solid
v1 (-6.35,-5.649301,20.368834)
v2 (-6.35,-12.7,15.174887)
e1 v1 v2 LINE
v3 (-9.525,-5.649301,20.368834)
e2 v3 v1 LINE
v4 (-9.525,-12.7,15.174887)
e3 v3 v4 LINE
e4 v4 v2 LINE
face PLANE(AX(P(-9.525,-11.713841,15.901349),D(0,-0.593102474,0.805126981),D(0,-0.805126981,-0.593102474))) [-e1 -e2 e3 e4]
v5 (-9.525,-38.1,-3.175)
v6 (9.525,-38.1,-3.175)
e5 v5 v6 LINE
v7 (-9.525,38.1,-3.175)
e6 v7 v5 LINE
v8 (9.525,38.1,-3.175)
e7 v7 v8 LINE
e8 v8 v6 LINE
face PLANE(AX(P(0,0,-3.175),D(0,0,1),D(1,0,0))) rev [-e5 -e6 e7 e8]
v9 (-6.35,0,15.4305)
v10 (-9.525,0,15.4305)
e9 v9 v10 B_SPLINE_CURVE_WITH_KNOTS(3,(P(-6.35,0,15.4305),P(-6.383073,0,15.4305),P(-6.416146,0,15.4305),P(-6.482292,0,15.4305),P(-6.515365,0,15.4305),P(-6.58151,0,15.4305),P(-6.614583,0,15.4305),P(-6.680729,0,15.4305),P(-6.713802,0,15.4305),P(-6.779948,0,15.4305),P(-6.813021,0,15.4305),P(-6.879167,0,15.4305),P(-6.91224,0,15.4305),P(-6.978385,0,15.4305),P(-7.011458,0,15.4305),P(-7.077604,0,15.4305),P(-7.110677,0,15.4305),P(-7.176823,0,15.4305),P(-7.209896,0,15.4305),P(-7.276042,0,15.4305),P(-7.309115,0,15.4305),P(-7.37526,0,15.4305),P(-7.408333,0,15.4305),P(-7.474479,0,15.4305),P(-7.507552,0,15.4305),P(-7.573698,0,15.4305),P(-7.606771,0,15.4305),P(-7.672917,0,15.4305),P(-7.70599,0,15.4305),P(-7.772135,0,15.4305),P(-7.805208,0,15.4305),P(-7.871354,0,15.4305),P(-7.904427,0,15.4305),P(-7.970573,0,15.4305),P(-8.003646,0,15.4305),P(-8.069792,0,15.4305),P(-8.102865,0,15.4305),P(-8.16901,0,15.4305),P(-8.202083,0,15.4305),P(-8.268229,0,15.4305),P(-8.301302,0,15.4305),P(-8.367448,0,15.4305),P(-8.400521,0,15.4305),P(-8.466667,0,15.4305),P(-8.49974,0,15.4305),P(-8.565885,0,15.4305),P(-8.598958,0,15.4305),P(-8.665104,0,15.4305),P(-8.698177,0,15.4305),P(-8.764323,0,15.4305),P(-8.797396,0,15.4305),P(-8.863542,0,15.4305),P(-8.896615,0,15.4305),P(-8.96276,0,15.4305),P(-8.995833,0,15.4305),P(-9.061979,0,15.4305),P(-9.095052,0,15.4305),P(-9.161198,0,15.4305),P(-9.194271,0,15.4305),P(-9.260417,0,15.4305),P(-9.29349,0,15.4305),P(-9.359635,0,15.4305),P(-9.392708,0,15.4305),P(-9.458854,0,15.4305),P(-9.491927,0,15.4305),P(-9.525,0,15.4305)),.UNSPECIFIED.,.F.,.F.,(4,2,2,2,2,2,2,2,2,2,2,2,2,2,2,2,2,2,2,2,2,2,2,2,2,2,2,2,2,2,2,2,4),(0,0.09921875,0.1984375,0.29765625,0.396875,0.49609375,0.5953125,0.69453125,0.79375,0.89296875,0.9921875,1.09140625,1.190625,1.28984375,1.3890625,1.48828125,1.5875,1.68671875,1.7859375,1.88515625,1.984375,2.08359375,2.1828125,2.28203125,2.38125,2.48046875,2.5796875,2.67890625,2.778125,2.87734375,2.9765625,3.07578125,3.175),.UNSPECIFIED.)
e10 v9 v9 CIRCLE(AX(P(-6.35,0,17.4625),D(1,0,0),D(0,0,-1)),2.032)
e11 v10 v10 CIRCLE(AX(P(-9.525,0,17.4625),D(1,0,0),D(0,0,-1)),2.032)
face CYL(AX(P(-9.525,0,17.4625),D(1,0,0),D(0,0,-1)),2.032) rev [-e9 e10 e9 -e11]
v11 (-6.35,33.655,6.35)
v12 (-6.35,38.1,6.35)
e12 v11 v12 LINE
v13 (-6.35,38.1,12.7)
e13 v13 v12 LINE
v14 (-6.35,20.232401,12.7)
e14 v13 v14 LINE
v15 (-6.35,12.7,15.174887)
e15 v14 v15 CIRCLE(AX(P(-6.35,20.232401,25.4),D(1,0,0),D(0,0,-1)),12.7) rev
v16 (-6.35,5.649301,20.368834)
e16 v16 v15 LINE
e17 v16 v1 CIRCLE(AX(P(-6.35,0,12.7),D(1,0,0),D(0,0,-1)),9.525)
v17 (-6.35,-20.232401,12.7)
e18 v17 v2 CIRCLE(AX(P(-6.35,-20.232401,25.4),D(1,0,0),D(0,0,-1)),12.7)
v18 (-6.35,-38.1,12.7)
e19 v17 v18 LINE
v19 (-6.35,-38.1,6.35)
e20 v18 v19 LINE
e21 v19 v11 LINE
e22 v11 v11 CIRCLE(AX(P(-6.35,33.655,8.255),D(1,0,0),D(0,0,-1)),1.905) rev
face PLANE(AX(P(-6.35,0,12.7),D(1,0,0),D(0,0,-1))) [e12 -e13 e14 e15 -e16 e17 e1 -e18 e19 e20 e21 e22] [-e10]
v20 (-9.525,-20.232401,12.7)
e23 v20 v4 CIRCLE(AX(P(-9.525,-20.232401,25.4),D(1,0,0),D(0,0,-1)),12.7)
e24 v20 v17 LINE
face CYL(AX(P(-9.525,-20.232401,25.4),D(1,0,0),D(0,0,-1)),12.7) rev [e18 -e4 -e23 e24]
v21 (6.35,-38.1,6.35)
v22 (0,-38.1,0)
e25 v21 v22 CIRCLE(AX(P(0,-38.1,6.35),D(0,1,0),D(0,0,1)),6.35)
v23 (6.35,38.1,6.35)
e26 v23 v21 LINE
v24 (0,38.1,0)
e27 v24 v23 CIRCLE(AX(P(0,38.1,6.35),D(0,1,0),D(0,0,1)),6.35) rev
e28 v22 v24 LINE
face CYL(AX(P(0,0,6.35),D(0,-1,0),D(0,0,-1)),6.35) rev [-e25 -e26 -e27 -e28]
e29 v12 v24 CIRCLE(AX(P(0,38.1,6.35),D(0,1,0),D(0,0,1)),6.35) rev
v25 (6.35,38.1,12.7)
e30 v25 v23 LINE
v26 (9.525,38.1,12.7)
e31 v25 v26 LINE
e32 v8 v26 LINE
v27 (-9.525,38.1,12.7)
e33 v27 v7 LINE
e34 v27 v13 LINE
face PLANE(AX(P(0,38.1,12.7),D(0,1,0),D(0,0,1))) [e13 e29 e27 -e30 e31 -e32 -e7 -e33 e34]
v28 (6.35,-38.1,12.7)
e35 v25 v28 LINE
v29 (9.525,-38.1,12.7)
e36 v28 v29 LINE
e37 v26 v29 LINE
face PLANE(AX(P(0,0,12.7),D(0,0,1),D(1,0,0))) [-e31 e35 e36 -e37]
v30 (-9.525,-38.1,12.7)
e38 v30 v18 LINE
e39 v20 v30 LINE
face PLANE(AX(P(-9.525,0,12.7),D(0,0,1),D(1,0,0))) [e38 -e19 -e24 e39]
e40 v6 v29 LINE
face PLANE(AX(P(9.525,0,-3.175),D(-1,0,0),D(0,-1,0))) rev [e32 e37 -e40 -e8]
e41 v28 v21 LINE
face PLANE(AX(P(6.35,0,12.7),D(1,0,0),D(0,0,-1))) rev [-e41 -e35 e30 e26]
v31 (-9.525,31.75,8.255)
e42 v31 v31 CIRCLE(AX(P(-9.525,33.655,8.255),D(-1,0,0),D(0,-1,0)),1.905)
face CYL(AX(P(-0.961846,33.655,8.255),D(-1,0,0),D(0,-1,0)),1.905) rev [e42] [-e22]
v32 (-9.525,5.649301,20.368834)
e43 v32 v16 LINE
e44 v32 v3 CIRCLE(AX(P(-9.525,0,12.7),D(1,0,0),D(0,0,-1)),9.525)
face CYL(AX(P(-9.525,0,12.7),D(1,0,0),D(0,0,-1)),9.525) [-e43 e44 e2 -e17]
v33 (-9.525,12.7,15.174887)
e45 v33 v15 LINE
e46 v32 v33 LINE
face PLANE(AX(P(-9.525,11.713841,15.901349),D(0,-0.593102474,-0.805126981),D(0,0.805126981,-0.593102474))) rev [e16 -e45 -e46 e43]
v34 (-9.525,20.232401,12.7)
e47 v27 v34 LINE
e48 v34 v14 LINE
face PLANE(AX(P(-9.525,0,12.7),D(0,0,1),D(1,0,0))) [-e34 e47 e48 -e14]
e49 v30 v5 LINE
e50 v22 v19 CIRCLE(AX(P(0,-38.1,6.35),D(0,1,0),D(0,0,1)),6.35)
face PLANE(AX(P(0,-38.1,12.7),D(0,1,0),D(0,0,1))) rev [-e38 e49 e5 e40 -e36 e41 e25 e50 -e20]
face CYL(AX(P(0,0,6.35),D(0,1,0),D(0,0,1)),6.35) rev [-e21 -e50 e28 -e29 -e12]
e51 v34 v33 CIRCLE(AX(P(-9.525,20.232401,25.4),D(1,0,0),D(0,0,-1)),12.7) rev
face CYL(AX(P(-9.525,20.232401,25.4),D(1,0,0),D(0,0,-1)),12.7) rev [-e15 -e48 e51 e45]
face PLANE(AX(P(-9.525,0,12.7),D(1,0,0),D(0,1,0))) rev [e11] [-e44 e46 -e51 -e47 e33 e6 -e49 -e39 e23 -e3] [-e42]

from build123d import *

# Parameters (mm, degrees)
SKETCH1_W               = 3.175
SKETCH1_H               = 76.2
BOSS_EXTRUDE1_DEPTH     = 12.7
BOSS_EXTRUDE1_2_DEPTH   = 12.7
SKETCH1_3_W             = 12.7
SKETCH1_3_H             = 76.2
SKETCH1_3_W_2           = 3.175
BOSS_EXTRUDE2_DEPTH     = 3.175
FILLET1_R               = 6.35
SKETCH2_W               = 3.175
SKETCH2_H               = 76.2
BOSS_EXTRUDE3_DEPTH     = 9.525
CUT_EXTRUDE1_DEPTH      = 47.878313216
CUT_EXTRUDE1_DEPTH_BACK = 47.878313216
SKETCH3_R               = 2.032
SKETCH4_R               = 1.905
CUT_EXTRUDE2_DEPTH      = 3.175


with BuildPart() as part:
    # Sketch1 → Boss-Extrude1 (new body)
    with BuildSketch(Plane.XY):
        with Locations((-7.9375, 0)):
            Rectangle(SKETCH1_W, SKETCH1_H)
    extrude(amount=BOSS_EXTRUDE1_DEPTH)



with BuildPart() as body_2:
    # Sketch1 → Boss-Extrude1 2 (new body)
    with BuildSketch(Plane.XY):
        with Locations((7.9375, 0)):
            Rectangle(SKETCH1_W, SKETCH1_H)
    extrude(amount=BOSS_EXTRUDE1_2_DEPTH)


with BuildPart() as part_1:
    add(part.part)

    add(body_2.part)  # Boss-Extrude2 merges body 2
    # Sketch1<3> → Boss-Extrude2 (add)
    with BuildSketch(Plane.XY):
        Rectangle(SKETCH1_3_W, SKETCH1_3_H)
        with Locations((7.9375, 0)):
            Rectangle(SKETCH1_3_W_2, SKETCH1_3_H)
        with Locations((-7.9375, 0)):
            Rectangle(SKETCH1_3_W_2, SKETCH1_3_H)
    extrude(amount=-BOSS_EXTRUDE2_DEPTH)

    # Fillet1
    fillet1_edges = [part_1.edges().sort_by_distance(p)[0] for p in [
        (6.35, 0, 0),
        (-6.35, 0, 0),
    ]]
    fillet(fillet1_edges, radius=FILLET1_R - 0.0001)  # a hair under: the kernel refuses the full size

    # Sketch2 → Boss-Extrude3 (add)
    with BuildSketch(Plane.XY.offset(12.7)):
        with Locations((-7.9375, 0)):
            Rectangle(SKETCH2_W, SKETCH2_H)
    extrude(amount=BOSS_EXTRUDE3_DEPTH)

    # Sketch3 → Cut-Extrude1 (cut, two sides: drawn at the far end of the back side and taken through both)
    with BuildSketch(Plane(origin=(-6.35, 0, 0), x_dir=(0, 0, -1), z_dir=(1, 0, 0)).offset(-CUT_EXTRUDE1_DEPTH_BACK)):
        with BuildLine():
            Line((-12.7, 38.1), (-22.225, 38.1))
            Line((-22.225, 38.1), (-22.225, -6.1e-08))
            ThreePointArc((-22.225, -6.1e-08), (-21.749068291, 2.973211742), (-20.368834491, 5.649301068))
            Line((-20.368834491, 5.649301068), (-15.174887346, 12.7))
            ThreePointArc((-15.174887346, 12.7), (-13.334575625, 16.268119062), (-12.7, 20.232401424))
            Line((-12.7, 20.232401424), (-12.7, 38.1))
        make_face()
        with BuildLine():
            ThreePointArc((-20.368834491, -5.649301068), (-21.749068272, -2.973211801), (-22.225, -6.1e-08))
            Line((-22.225, -6.1e-08), (-22.225, -38.1))
            Line((-22.225, -38.1), (-12.7, -38.1))
            Line((-12.7, -38.1), (-12.7, -20.232401424))
            ThreePointArc((-12.7, -20.232401424), (-13.334575625, -16.268119062), (-15.174887346, -12.7))
            Line((-15.174887346, -12.7), (-20.368834491, -5.649301068))
        make_face()
        with Locations((-17.4625, 0)):
            Circle(SKETCH3_R)
    extrude(amount=CUT_EXTRUDE1_DEPTH + CUT_EXTRUDE1_DEPTH_BACK, mode=Mode.SUBTRACT)

    # Sketch4 → Cut-Extrude2 (cut)
    with BuildSketch(Plane.ZY.offset(9.525)):
        with Locations(Location((8.255, 33.655, 0), (0, 0, 270))):
            Circle(SKETCH4_R)
    extrude(amount=-CUT_EXTRUDE2_DEPTH, mode=Mode.SUBTRACT)


solid = part_1.part
